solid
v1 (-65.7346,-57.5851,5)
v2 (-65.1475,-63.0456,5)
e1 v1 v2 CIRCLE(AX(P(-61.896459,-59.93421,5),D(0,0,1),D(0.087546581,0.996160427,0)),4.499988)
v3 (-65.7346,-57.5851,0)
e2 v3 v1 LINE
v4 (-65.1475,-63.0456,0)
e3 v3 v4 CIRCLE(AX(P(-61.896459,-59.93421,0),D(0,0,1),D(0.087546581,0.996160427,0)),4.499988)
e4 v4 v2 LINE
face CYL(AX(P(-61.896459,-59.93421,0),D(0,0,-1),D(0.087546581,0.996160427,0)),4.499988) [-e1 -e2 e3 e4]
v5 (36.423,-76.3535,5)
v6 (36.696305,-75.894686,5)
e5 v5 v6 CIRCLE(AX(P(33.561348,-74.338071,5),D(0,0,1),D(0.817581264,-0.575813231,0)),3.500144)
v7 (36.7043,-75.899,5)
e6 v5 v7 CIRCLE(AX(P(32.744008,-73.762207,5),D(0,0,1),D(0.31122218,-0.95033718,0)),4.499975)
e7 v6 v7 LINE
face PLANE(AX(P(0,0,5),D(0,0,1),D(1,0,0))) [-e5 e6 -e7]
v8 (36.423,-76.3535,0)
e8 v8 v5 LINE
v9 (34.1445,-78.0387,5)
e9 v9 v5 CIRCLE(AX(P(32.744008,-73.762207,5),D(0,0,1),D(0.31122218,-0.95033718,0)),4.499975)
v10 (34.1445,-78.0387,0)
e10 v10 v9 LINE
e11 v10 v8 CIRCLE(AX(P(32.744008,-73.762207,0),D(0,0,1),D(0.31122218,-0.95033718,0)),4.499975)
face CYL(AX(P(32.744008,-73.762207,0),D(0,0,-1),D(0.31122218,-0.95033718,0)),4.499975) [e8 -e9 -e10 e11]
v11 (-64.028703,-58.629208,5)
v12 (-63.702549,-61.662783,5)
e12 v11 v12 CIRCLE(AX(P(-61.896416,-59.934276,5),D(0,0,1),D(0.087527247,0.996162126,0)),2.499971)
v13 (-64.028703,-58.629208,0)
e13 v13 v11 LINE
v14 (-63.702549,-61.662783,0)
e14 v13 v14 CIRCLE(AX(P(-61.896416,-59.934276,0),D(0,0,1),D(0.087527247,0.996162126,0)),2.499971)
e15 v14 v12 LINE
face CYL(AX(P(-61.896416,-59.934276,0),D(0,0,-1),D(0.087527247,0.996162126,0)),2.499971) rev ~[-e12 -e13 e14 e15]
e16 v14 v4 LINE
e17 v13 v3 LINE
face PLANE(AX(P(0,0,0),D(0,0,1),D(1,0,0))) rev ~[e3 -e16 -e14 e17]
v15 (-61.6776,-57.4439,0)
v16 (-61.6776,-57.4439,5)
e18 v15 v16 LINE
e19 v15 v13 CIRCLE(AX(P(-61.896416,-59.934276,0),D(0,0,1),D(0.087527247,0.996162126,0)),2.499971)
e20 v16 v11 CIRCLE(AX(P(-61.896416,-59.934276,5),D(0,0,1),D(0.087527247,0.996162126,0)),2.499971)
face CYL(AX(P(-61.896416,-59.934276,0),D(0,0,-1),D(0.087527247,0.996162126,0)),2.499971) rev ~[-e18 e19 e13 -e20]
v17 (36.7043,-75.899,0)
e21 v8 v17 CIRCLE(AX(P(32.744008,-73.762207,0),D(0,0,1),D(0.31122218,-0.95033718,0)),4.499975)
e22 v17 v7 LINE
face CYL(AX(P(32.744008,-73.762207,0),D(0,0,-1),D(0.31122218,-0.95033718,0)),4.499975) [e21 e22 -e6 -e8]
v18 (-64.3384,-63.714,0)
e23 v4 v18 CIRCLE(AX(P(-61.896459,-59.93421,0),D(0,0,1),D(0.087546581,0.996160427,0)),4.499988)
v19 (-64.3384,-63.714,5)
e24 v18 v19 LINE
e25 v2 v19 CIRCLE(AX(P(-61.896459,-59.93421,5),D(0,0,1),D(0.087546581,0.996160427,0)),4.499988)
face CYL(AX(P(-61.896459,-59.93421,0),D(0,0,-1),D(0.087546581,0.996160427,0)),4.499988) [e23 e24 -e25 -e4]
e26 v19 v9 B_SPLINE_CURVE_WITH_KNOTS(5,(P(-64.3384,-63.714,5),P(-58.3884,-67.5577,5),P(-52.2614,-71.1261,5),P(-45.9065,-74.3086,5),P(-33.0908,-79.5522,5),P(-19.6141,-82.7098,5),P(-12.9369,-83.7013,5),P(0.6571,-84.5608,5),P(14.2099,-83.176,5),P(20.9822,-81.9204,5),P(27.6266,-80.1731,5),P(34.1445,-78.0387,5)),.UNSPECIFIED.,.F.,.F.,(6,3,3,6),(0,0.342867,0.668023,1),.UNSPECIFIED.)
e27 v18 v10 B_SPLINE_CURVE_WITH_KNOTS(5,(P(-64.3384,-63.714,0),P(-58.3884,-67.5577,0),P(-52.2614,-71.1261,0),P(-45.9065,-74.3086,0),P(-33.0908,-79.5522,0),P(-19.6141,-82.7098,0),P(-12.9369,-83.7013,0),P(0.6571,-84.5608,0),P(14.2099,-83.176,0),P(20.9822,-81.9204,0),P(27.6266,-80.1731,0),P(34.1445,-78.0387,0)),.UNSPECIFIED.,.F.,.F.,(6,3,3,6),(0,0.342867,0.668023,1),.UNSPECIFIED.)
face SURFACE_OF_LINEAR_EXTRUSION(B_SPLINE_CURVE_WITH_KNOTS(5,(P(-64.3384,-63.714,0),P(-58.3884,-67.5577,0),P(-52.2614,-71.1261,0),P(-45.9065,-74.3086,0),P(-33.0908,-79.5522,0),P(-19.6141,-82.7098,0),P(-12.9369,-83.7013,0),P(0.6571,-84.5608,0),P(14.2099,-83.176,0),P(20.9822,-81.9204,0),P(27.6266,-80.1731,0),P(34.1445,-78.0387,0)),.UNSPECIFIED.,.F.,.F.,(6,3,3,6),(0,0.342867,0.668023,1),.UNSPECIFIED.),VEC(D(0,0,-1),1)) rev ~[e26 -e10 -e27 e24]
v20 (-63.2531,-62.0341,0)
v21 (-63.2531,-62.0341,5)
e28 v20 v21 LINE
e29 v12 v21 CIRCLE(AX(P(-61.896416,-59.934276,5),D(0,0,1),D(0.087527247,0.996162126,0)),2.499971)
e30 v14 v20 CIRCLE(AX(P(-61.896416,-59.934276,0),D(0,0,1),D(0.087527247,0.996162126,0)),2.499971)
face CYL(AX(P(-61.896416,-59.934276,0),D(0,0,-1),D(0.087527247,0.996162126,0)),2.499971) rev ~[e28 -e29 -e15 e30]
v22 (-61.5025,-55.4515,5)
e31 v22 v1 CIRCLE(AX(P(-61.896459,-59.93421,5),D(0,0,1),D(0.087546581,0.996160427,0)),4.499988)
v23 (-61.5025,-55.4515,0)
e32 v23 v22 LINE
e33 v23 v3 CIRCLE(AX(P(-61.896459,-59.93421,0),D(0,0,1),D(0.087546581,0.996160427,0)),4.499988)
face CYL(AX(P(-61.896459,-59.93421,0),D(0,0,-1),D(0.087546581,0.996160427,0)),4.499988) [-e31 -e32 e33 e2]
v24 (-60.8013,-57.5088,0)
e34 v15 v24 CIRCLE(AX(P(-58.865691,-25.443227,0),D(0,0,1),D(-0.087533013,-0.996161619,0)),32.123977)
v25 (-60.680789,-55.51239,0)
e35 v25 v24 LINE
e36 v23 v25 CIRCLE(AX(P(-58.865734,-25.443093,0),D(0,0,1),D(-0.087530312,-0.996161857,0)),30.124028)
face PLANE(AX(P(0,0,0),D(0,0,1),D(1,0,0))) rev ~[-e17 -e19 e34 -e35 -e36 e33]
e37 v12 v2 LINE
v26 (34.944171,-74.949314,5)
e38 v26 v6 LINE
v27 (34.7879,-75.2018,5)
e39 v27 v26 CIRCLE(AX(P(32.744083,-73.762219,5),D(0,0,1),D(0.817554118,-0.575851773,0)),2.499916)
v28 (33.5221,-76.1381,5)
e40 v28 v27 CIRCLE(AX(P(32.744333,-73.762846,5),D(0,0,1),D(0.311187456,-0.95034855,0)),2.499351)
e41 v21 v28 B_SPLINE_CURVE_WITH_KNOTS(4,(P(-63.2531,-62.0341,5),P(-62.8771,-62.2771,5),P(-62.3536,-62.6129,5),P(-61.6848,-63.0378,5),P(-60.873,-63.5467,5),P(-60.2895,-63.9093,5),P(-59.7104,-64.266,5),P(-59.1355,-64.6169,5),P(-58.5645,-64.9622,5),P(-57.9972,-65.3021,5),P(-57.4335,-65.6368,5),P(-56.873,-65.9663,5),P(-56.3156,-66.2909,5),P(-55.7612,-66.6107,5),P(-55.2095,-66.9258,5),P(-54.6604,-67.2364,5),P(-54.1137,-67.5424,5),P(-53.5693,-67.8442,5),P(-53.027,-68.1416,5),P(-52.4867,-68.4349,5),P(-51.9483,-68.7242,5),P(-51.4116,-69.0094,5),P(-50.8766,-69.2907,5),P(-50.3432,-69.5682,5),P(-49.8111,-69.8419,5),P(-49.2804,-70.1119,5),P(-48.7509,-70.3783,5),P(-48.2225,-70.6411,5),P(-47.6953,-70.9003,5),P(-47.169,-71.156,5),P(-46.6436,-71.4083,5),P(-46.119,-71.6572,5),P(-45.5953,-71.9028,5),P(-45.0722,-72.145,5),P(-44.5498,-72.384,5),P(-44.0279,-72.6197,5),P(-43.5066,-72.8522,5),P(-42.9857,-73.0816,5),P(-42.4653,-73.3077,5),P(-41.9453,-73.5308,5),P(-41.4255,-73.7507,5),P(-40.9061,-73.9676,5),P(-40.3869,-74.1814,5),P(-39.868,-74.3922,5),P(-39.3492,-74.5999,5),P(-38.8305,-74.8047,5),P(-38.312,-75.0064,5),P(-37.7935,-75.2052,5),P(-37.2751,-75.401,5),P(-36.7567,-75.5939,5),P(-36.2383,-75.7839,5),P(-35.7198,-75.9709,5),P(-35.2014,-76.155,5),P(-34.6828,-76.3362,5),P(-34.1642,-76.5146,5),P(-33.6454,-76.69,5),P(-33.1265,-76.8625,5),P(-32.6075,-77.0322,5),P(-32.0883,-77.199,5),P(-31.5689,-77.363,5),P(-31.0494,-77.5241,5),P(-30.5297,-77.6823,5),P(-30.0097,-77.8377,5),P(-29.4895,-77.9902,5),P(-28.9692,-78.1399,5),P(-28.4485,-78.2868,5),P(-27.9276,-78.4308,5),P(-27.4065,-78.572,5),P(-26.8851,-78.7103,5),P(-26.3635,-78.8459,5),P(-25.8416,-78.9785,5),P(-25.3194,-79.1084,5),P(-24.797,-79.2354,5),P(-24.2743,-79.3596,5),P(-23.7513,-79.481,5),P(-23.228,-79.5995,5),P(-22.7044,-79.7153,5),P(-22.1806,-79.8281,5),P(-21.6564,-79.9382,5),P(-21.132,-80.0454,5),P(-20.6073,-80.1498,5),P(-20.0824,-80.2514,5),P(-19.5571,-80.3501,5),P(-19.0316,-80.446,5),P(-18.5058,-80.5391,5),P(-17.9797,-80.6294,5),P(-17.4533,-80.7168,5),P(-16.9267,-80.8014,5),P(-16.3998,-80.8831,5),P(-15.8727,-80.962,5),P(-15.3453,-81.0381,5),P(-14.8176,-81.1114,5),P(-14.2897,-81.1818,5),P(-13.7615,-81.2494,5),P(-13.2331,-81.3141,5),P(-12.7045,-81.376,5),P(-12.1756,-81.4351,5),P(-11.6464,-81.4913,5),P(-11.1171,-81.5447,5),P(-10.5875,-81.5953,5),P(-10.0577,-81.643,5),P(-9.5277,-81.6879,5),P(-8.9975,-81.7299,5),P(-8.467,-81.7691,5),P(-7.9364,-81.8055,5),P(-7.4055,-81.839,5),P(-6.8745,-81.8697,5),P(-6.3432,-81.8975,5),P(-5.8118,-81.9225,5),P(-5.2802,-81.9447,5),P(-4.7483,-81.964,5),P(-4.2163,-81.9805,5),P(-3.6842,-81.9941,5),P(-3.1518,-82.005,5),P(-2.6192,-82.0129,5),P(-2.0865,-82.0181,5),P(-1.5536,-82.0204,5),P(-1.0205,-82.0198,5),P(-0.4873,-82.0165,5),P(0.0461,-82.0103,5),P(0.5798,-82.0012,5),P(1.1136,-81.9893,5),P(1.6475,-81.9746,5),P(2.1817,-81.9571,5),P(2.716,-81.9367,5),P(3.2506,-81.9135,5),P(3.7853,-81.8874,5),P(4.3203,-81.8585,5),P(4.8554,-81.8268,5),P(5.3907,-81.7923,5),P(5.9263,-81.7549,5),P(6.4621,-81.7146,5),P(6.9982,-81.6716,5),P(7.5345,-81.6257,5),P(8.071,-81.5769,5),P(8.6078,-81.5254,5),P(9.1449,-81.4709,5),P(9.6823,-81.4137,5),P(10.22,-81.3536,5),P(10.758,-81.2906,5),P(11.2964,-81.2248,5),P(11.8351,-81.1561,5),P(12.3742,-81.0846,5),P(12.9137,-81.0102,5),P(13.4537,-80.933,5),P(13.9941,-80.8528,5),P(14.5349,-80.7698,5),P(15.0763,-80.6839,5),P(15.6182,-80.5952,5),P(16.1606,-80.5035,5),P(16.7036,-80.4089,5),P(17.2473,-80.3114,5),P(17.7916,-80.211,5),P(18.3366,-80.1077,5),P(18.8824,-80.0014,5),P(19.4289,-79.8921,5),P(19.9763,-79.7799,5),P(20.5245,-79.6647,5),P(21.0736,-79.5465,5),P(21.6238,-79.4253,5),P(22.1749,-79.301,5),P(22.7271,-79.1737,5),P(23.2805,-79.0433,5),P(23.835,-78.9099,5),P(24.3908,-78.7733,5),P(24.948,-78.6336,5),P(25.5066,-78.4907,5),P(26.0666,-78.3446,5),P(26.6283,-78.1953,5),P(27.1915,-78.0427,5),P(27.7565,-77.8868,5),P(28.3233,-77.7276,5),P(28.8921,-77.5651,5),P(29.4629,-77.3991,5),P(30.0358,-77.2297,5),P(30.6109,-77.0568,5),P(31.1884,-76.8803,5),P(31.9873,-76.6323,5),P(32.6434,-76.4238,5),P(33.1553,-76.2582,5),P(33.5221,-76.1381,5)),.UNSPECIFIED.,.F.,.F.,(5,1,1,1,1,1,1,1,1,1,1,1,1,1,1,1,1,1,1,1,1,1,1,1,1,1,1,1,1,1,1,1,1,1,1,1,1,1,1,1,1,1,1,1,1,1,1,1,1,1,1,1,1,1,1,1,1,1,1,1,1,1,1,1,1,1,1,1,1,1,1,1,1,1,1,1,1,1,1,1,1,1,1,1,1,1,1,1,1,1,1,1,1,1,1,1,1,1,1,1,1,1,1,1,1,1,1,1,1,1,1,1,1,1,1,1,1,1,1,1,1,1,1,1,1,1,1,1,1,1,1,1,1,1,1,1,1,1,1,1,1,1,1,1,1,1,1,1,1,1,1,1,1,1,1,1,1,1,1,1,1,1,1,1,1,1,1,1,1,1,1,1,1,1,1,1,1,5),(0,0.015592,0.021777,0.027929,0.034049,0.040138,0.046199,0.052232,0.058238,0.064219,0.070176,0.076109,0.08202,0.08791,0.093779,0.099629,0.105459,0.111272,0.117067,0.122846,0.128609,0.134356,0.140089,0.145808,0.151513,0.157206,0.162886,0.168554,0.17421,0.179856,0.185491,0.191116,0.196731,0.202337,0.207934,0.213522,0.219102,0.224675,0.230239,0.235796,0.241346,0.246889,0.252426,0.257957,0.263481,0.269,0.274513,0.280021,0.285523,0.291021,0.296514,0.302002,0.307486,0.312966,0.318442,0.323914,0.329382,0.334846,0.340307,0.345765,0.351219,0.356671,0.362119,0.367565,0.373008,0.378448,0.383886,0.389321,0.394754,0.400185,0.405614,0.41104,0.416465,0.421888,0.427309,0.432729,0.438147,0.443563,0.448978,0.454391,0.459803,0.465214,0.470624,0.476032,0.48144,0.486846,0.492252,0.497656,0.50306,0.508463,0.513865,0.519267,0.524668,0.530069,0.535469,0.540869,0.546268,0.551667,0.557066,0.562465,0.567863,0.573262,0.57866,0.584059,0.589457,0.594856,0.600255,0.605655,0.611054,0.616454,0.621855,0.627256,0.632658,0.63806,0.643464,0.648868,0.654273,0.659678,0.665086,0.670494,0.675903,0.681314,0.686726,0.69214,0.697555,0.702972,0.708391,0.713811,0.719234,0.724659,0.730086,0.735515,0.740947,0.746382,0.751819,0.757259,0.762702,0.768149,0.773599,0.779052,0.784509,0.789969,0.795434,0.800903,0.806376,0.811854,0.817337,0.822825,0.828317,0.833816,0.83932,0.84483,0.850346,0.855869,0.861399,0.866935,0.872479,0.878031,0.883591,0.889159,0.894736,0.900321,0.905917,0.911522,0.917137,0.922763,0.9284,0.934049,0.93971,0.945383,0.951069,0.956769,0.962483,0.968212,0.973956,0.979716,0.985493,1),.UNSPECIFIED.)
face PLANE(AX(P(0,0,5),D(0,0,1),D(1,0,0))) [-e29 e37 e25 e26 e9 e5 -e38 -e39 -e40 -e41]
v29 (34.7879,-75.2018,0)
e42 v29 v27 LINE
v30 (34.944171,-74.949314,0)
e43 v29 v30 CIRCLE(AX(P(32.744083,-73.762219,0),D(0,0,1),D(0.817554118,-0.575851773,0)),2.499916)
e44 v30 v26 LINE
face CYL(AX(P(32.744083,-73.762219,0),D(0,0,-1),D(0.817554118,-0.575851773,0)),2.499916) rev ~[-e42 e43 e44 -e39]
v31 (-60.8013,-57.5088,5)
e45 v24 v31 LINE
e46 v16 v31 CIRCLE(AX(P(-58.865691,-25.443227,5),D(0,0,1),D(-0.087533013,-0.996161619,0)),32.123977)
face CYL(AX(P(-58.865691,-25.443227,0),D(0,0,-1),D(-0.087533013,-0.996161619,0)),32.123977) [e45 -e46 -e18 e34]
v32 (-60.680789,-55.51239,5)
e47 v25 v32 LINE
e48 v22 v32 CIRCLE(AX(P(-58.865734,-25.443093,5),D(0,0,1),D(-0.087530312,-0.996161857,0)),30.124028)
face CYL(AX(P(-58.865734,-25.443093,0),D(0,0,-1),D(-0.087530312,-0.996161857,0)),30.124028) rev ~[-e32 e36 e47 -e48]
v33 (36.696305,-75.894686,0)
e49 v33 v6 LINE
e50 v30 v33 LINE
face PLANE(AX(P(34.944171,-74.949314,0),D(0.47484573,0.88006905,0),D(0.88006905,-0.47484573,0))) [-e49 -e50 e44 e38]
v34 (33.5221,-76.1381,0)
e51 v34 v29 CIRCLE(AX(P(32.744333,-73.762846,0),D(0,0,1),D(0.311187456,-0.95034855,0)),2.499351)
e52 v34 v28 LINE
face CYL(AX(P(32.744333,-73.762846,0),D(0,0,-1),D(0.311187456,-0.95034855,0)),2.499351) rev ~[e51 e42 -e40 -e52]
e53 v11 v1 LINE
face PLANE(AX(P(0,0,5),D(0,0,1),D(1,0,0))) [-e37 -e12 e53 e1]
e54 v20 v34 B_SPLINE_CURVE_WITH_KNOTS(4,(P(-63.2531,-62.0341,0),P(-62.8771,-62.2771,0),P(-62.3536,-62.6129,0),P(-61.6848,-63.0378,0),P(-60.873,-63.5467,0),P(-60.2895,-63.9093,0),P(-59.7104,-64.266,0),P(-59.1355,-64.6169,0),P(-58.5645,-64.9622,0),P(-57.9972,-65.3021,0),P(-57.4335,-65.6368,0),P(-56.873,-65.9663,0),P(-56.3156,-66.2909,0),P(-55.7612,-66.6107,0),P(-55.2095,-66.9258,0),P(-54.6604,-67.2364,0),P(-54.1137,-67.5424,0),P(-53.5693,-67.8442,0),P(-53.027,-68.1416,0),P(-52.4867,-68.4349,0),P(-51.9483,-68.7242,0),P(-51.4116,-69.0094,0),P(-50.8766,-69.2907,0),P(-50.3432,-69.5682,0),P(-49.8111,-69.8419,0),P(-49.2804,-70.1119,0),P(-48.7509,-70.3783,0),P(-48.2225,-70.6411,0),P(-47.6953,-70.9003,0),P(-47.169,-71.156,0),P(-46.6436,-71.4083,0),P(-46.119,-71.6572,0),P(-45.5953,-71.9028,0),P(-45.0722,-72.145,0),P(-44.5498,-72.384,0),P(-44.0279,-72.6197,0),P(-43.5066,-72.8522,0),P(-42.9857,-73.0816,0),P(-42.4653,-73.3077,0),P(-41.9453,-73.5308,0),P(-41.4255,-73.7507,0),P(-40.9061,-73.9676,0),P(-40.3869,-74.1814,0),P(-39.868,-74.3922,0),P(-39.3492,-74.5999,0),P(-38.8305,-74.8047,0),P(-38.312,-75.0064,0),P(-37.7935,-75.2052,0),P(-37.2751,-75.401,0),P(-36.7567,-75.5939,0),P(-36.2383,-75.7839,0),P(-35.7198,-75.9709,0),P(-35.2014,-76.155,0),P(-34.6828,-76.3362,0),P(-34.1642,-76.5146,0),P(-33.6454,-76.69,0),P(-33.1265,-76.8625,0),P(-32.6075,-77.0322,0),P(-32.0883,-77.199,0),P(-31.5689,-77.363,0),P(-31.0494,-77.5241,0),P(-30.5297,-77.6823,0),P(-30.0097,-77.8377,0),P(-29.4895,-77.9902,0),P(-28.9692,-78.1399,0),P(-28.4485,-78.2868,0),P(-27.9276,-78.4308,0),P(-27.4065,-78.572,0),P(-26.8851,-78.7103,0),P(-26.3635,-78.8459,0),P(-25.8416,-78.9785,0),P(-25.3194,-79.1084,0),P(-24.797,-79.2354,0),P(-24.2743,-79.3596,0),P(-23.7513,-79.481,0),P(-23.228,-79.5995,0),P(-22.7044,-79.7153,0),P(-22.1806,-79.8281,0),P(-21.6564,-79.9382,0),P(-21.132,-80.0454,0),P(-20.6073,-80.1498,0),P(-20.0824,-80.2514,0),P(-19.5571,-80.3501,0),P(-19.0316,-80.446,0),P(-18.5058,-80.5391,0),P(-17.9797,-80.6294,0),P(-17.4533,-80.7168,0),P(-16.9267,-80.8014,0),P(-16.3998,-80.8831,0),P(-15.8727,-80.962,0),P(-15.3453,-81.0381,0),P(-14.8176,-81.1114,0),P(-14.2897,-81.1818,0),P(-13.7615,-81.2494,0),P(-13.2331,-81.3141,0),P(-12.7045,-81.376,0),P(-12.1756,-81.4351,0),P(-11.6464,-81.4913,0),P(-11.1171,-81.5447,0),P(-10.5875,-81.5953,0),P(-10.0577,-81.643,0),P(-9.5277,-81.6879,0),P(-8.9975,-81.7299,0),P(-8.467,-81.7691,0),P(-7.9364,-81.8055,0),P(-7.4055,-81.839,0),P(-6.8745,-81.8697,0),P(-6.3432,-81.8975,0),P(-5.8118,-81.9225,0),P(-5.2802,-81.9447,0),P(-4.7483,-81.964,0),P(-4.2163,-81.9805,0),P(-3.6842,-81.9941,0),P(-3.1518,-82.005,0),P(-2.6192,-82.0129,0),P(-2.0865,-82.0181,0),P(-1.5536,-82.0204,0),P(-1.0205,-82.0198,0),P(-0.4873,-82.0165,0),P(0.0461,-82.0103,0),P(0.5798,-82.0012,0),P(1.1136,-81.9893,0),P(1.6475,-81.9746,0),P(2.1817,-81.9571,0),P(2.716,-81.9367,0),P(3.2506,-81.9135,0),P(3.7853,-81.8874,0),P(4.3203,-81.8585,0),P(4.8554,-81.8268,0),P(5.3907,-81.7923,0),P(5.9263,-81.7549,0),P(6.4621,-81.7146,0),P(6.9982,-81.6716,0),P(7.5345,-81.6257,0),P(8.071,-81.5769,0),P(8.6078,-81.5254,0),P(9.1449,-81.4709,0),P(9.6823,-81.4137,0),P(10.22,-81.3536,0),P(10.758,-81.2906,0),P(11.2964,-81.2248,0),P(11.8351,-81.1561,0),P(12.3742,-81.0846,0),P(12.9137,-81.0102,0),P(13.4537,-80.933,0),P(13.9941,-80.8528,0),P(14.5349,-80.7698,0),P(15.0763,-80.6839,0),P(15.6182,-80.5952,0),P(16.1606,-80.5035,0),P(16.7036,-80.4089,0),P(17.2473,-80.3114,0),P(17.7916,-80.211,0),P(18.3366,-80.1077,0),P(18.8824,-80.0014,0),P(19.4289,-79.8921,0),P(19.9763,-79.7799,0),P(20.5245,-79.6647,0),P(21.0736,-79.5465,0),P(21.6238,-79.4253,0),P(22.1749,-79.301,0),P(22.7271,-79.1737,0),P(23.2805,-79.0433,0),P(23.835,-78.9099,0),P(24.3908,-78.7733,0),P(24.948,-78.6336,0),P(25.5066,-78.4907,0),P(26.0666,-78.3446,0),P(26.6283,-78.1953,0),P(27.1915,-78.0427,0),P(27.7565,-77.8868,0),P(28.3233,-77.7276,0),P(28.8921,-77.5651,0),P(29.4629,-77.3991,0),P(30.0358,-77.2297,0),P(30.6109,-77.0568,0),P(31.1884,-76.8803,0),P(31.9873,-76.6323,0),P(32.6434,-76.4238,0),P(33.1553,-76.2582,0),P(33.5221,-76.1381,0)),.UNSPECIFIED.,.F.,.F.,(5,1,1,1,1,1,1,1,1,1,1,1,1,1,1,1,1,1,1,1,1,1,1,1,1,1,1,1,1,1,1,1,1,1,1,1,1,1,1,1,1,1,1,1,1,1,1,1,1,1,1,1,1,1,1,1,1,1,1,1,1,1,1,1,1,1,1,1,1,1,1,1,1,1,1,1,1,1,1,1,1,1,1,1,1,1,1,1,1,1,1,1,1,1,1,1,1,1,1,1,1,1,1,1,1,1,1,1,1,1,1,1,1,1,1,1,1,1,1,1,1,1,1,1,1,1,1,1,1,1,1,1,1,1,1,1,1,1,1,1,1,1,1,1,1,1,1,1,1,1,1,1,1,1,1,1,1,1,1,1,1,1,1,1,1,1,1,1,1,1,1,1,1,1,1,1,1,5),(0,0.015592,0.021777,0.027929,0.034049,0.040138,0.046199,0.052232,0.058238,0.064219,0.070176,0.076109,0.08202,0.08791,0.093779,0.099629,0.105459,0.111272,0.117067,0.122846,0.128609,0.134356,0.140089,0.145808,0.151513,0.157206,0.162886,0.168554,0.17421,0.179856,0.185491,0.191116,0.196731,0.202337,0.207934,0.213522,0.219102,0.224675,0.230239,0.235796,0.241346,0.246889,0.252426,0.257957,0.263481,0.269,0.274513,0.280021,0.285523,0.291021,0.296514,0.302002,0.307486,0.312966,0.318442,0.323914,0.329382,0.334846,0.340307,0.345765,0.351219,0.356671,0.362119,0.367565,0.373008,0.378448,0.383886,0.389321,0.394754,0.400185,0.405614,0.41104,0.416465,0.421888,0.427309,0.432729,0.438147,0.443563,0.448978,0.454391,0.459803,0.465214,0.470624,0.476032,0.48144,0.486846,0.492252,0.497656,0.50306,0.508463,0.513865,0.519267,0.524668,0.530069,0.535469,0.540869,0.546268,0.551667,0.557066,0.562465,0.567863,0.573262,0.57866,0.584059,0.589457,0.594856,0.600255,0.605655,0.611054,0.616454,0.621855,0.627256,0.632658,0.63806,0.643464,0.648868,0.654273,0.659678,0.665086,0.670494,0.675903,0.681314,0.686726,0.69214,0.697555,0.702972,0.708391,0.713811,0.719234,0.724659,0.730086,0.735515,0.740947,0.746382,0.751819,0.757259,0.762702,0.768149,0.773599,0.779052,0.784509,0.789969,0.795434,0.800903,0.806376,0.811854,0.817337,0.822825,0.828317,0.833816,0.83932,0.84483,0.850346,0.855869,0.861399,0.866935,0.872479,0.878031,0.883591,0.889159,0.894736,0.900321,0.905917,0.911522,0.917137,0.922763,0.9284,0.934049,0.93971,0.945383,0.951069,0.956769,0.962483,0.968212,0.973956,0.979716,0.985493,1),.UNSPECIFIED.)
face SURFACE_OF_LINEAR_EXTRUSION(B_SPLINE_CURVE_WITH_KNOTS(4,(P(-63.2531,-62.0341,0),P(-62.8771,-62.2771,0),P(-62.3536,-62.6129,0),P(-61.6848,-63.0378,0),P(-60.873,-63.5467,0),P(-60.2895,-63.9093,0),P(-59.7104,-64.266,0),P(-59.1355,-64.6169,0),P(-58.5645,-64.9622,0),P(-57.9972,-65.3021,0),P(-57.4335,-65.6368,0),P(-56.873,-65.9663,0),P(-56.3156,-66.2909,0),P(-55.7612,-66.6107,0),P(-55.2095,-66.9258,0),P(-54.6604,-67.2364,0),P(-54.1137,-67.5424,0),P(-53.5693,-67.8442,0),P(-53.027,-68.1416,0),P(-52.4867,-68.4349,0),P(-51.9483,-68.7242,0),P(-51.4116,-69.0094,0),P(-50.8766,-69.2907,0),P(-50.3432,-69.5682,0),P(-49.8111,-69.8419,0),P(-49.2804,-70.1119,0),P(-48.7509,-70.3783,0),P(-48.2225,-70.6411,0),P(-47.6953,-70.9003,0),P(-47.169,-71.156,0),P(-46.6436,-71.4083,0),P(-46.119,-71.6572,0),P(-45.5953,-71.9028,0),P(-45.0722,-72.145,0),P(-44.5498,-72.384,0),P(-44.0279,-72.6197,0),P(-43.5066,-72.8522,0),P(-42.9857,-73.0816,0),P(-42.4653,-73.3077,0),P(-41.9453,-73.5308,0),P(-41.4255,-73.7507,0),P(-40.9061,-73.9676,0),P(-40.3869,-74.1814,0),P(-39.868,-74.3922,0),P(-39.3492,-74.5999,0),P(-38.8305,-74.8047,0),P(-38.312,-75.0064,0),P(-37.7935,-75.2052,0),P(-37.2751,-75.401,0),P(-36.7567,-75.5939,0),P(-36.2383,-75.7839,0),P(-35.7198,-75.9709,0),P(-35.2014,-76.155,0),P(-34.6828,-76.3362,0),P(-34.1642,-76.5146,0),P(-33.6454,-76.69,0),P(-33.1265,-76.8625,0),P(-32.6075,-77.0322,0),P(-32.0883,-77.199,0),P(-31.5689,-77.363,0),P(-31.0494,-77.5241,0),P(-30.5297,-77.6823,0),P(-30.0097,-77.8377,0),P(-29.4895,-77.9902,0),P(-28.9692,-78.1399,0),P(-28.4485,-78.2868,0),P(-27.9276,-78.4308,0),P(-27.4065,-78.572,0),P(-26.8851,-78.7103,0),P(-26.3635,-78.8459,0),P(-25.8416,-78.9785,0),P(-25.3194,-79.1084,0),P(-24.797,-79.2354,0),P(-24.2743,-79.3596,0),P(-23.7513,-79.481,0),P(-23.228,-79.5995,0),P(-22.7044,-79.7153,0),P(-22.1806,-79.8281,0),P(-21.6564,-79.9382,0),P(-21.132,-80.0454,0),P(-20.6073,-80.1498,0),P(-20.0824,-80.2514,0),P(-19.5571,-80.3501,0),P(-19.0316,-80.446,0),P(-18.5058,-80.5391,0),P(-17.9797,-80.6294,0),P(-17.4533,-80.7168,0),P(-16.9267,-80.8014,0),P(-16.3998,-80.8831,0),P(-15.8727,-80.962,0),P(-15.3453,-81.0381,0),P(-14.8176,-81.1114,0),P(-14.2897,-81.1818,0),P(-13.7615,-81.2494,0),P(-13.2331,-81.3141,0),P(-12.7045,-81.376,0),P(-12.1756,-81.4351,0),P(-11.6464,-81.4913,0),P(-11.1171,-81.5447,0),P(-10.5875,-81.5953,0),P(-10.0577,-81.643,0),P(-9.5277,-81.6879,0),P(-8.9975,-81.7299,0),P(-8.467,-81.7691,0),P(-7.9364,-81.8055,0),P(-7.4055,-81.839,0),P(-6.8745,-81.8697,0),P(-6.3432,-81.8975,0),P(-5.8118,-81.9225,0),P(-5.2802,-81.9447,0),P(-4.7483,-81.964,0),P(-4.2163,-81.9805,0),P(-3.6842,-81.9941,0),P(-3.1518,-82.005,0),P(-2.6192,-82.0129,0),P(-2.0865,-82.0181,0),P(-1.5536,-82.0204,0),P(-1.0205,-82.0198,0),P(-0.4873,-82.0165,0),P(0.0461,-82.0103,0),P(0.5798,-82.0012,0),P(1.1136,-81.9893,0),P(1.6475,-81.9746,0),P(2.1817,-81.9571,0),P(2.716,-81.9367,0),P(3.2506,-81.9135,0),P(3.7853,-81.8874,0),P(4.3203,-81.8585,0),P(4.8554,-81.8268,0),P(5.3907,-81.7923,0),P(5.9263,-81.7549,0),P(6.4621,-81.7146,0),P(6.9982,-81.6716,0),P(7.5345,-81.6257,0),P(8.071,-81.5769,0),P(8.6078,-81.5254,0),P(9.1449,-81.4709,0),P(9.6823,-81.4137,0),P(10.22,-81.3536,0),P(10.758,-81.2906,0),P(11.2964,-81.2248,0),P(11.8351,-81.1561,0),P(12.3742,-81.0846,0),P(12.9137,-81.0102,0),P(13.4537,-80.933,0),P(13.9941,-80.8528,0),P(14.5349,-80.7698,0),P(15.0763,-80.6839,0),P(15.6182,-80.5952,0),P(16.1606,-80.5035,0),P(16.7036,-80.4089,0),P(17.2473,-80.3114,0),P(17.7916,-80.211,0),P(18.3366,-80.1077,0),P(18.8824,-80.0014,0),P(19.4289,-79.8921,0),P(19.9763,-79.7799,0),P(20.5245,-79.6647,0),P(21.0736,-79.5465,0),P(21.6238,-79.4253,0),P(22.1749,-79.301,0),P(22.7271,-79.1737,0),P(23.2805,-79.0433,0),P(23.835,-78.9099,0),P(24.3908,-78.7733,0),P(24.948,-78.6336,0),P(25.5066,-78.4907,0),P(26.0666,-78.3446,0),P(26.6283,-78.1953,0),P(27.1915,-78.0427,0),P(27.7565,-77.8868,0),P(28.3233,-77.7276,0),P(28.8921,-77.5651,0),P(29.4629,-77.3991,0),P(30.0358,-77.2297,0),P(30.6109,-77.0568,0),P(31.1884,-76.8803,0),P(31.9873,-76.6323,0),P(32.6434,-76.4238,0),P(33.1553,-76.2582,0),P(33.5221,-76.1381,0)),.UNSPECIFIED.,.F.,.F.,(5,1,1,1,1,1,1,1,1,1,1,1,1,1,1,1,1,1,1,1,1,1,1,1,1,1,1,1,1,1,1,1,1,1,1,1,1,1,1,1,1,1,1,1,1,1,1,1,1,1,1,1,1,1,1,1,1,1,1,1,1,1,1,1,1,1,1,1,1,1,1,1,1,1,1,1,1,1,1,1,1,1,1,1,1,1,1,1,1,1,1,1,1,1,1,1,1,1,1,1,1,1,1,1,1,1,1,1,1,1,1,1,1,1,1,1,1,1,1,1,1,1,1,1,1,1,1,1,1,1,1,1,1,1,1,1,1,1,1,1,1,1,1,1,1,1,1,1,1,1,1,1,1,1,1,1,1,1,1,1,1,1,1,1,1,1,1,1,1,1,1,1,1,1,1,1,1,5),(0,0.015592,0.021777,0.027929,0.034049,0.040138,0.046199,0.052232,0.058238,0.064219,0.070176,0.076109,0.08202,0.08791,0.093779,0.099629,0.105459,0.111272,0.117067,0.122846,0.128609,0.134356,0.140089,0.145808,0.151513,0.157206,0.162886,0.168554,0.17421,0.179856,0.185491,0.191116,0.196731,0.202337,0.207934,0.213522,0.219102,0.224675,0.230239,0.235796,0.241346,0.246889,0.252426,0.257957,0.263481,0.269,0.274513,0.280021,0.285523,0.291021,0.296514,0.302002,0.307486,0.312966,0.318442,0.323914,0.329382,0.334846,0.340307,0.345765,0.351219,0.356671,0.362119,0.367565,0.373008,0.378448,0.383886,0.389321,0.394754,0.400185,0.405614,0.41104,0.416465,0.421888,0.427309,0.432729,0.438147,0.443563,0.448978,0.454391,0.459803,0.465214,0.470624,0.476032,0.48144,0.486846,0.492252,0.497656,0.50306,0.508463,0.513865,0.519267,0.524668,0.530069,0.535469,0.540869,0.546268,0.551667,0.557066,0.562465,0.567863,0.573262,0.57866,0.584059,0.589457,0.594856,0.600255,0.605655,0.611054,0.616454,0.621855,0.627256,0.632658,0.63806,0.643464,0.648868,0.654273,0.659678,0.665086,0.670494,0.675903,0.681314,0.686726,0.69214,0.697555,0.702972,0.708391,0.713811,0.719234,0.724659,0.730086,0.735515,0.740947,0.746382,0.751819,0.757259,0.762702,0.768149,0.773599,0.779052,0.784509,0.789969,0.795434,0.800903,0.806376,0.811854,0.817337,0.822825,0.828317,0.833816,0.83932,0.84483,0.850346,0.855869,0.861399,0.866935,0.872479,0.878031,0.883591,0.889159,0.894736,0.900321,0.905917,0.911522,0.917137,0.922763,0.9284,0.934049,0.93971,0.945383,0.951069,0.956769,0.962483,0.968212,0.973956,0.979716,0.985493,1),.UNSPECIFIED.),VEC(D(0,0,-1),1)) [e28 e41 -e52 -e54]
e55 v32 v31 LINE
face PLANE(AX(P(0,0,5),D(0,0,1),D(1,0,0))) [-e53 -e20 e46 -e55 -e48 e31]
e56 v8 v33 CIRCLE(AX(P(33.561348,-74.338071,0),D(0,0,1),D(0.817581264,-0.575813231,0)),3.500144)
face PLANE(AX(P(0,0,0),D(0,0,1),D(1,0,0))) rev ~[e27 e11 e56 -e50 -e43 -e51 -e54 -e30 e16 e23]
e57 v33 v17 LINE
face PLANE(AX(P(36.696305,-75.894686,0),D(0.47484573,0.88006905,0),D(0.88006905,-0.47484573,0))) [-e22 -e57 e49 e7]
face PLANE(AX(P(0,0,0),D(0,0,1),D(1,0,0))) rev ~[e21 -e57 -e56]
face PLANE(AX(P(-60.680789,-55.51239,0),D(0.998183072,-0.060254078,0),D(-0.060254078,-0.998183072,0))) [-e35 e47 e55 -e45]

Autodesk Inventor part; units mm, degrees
ref_plane "YZ Plane" through (0, 0, 0) normal (1, 0, 0) x (0, 1, 0)
ref_plane "XZ Plane" through (0, 0, 0) normal (0, 1, 0) x (-1, 0, 0)
ref_plane "XY Plane" through (0, 0, 0) normal (0, 0, 1) x (1, 0, 0)
sketch "スケッチ1" plane through (0, 0, 0) normal (0, 0, 1) x (1, 0, 0)
  circle A0 centre (0, -30) radius 22.5
  arc A1 (33.5221, -76.1381) -> (34.7879, -75.2018) centre (32.744, -73.7622) ccw
  arc A2 (25.323, -41.3574) -> (34.2025, -71.7318) centre (49.1917, -50.8648) ccw
  arc A3 (25.323, -41.3574) -> (17.6049, -10.4152) centre (-0.0473, -31.252) ccw
  arc A4 (17.6049, -10.4152) -> (7.2408, -4.7162) centre (-0.2944, -30.6931) ccw
  arc A5 (5.1078, -1.4883) -> (7.2408, -4.7162) centre (8.0549, -1.8596) ccw
  arc A6 (5.1078, -1.4883) -> (-5.8369, -1.4852) centre (-0.3643, -0.7018) ccw
  arc A7 (-5.8369, -1.4852) -> (-5.7215, -2.051) centre (-0.3936, -0.6703) ccw
  arc A8 (-7.4636, -3.4089) -> (-5.7215, -2.051) centre (-8.3074, -0.53) ccw
  arc A9 (-7.4636, -3.4089) -> (-26.8108, -27.5489) centre (0.1311, -29.3188) ccw
  arc A10 (-61.6776, -57.4439) -> (-26.8108, -27.5489) centre (-58.8657, -25.4432) ccw
  arc A11 (-61.6776, -57.4439) -> (-63.2531, -62.0341) centre (-61.8964, -59.9343) ccw
  spline S0 degree 4 poles (-63.2531, -62.0341) (-62.8771, -62.2771) (-62.3536, -62.6129) (-61.6848, -63.0378) (-60.873, -63.5467) (-60.2895, -63.9093) (-59.7104, -64.266) (-59.1355, -64.6169) (-58.5645, -64.9622) (-57.9972, -65.3021) (-57.4335, -65.6368) (-56.873, -65.9663) (-56.3156, -66.2909) (-55.7612, -66.6107) (-55.2095, -66.9258) (-54.6604, -67.2364) (-54.1137, -67.5424) (-53.5693, -67.8442) (-53.027, -68.1416) (-52.4867, -68.4349) (-51.9483, -68.7242) (-51.4116, -69.0094) (-50.8766, -69.2907) (-50.3432, -69.5682) (-49.8111, -69.8419) (-49.2804, -70.1119) (-48.7509, -70.3783) (-48.2225, -70.6411) (-47.6953, -70.9003) (-47.169, -71.156) (-46.6436, -71.4083) (-46.119, -71.6572) (-45.5953, -71.9028) (-45.0722, -72.145) (-44.5498, -72.384) (-44.0279, -72.6197) (-43.5066, -72.8522) (-42.9857, -73.0816) (-42.4653, -73.3077) (-41.9453, -73.5308) (-41.4255, -73.7507) (-40.9061, -73.9676) (-40.3869, -74.1814) (-39.868, -74.3922) (-39.3492, -74.5999) (-38.8305, -74.8047) (-38.312, -75.0064) (-37.7935, -75.2052) (-37.2751, -75.401) (-36.7567, -75.5939) (-36.2383, -75.7839) (-35.7198, -75.9709) (-35.2014, -76.155) (-34.6828, -76.3362) (-34.1642, -76.5146) (-33.6454, -76.69) (-33.1265, -76.8625) (-32.6075, -77.0322) (-32.0883, -77.199) (-31.5689, -77.363) (-31.0494, -77.5241) (-30.5297, -77.6823) (-30.0097, -77.8377) (-29.4895, -77.9902) (-28.9692, -78.1399) (-28.4485, -78.2868) (-27.9276, -78.4308) (-27.4065, -78.572) (-26.8851, -78.7103) (-26.3635, -78.8459) (-25.8416, -78.9785) (-25.3194, -79.1084) (-24.797, -79.2354) (-24.2743, -79.3596) (-23.7513, -79.481) (-23.228, -79.5995) (-22.7044, -79.7153) (-22.1806, -79.8281) (-21.6564, -79.9382) (-21.132, -80.0454) (-20.6073, -80.1498) (-20.0824, -80.2514) (-19.5571, -80.3501) (-19.0316, -80.446) (-18.5058, -80.5391) (-17.9797, -80.6294) (-17.4533, -80.7168) (-16.9267, -80.8014) (-16.3998, -80.8831) (-15.8727, -80.962) (-15.3453, -81.0381) (-14.8176, -81.1114) (-14.2897, -81.1818) (-13.7615, -81.2494) (-13.2331, -81.3141) (-12.7045, -81.376) (-12.1756, -81.4351) (-11.6464, -81.4913) (-11.1171, -81.5447) (-10.5875, -81.5953) (-10.0577, -81.643) (-9.5277, -81.6879) (-8.9975, -81.7299) (-8.467, -81.7691) (-7.9364, -81.8055) (-7.4055, -81.839) (-6.8745, -81.8697) (-6.3432, -81.8975) (-5.8118, -81.9225) (-5.2802, -81.9447) (-4.7483, -81.964) (-4.2163, -81.9805) (-3.6842, -81.9941) (-3.1518, -82.005) (-2.6192, -82.0129) (-2.0865, -82.0181) (-1.5536, -82.0204) (-1.0205, -82.0198) (-0.4873, -82.0165) (0.0461, -82.0103) (0.5798, -82.0012) (1.1136, -81.9893) (1.6475, -81.9746) (2.1817, -81.9571) (2.716, -81.9367) (3.2506, -81.9135) (3.7853, -81.8874) (4.3203, -81.8585) (4.8554, -81.8268) (5.3907, -81.7923) (5.9263, -81.7549) (6.4621, -81.7146) (6.9982, -81.6716) (7.5345, -81.6257) (8.071, -81.5769) (8.6078, -81.5254) (9.1449, -81.4709) (9.6823, -81.4137) (10.22, -81.3536) (10.758, -81.2906) (11.2964, -81.2248) (11.8351, -81.1561) (12.3742, -81.0846) (12.9137, -81.0102) (13.4537, -80.933) (13.9941, -80.8528) (14.5349, -80.7698) (15.0763, -80.6839) (15.6182, -80.5952) (16.1606, -80.5035) (16.7036, -80.4089) (17.2473, -80.3114) (17.7916, -80.211) (18.3366, -80.1077) (18.8824, -80.0014) (19.4289, -79.8921) (19.9763, -79.7799) (20.5245, -79.6647) (21.0736, -79.5465) (21.6238, -79.4253) (22.1749, -79.301) (22.7271, -79.1737) (23.2805, -79.0433) (23.835, -78.9099) (24.3908, -78.7733) (24.948, -78.6336) (25.5066, -78.4907) (26.0666, -78.3446) (26.6283, -78.1953) (27.1915, -78.0427) (27.7565, -77.8868) (28.3233, -77.7276) (28.8921, -77.5651) (29.4629, -77.3991) (30.0358, -77.2297) (30.6109, -77.0568) (31.1884, -76.8803) (31.9873, -76.6323) (32.6434, -76.4238) (33.1553, -76.2582) (33.5221, -76.1381) knots 0 0 0 0 0 0.015592 0.021777 0.027929 0.034049 0.040138 0.046199 0.052232 0.058238 0.064219 0.070176 0.076109 0.08202 0.08791 0.093779 0.099629 0.105459 0.111272 0.117067 0.122846 0.128609 0.134356 0.140089 0.145808 0.151513 0.157206 0.162886 0.168554 0.17421 0.179856 0.185491 0.191116 0.196731 0.202337 0.207934 0.213522 0.219102 0.224675 0.230239 0.235796 0.241346 0.246889 0.252426 0.257957 0.263481 0.269 0.274513 0.280021 0.285523 0.291021 0.296514 0.302002 0.307486 0.312966 0.318442 0.323914 0.329382 0.334846 0.340307 0.345765 0.351219 0.356671 0.362119 0.367565 0.373008 0.378448 0.383886 0.389321 0.394754 0.400185 0.405614 0.41104 0.416465 0.421888 0.427309 0.432729 0.438147 0.443563 0.448978 0.454391 0.459803 0.465214 0.470624 0.476032 0.48144 0.486846 0.492252 0.497656 0.50306 0.508463 0.513865 0.519267 0.524668 0.530069 0.535469 0.540869 0.546268 0.551667 0.557066 0.562465 0.567863 0.573262 0.57866 0.584059 0.589457 0.594856 0.600255 0.605655 0.611054 0.616454 0.621855 0.627256 0.632658 0.63806 0.643464 0.648868 0.654273 0.659678 0.665086 0.670494 0.675903 0.681314 0.686726 0.69214 0.697555 0.702972 0.708391 0.713811 0.719234 0.724659 0.730086 0.735515 0.740947 0.746382 0.751819 0.757259 0.762702 0.768149 0.773599 0.779052 0.784509 0.789969 0.795434 0.800903 0.806376 0.811854 0.817337 0.822825 0.828317 0.833816 0.83932 0.84483 0.850346 0.855869 0.861399 0.866935 0.872479 0.878031 0.883591 0.889159 0.894736 0.900321 0.905917 0.911522 0.917137 0.922763 0.9284 0.934049 0.93971 0.945383 0.951069 0.956769 0.962483 0.968212 0.973956 0.979716 0.985493 1 1 1 1 1
  arc A12 (34.1445, -78.0387) -> (35.3693, -70.1074) centre (32.744, -73.7622) ccw
  arc A13 (27.181, -42.0975) -> (35.3693, -70.1074) centre (49.1917, -50.8648) ccw
  arc A14 (27.181, -42.0975) -> (18.9132, -8.9024) centre (-0.0473, -31.252) ccw
  arc A15 (18.9132, -8.9024) -> (7.7922, -2.7937) centre (-0.2944, -30.6931) ccw
  arc A16 (7.0908, -1.7497) -> (7.7922, -2.7937) centre (8.0549, -1.8596) ccw
  arc A17 (7.0908, -1.7497) -> (-7.8158, -1.7749) centre (-0.3643, -0.7018) ccw
  arc A18 (-7.8158, -1.7749) -> (-7.8596, -1.4241) centre (-0.3936, -0.6703) ccw
  arc A19 (-8.0261, -1.4896) -> (-7.8596, -1.4241) centre (-8.3074, -0.53) ccw
  arc A20 (-8.0261, -1.4896) -> (-28.8065, -27.4178) centre (0.1311, -29.3188) ccw
  arc A21 (-61.5025, -55.4515) -> (-28.8065, -27.4178) centre (-58.8657, -25.4432) ccw
  arc A22 (-61.5025, -55.4515) -> (-64.3384, -63.714) centre (-61.8964, -59.9343) ccw
  line L0 (32.744, -73.7622) -> (36.7043, -75.899)
  line L1 (-58.8657, -25.4432) -> (-60.8013, -57.5088)
  line L2 (-61.8964, -59.9343) -> (-65.1475, -63.0456)
  line L3 (-61.8964, -59.9343) -> (-65.7346, -57.5851)
  line L4 (49.1917, -50.8648) -> (30.5824, -70.5938)
  arc A23 (-5.8375, -1.4811) -> (-5.8362, -1.4893) centre (-4.7979, -1.3331) ccw
  arc A24 (-5.8362, -1.4893) -> (-5.8121, -1.6365) centre (-0.3936, -0.6703) ccw
  arc A25 (-6.0587, -2.5158) -> (-5.8121, -1.6365) centre (-6.8458, -1.8208) ccw
  arc A26 (-7.4636, -3.4089) -> (-6.0587, -2.5158) centre (-8.3074, -0.53) ccw
  arc A27 (-7.4636, -3.4089) -> (-26.8108, -27.5489) centre (0.1311, -29.3188) ccw
  arc A28 (-61.6776, -57.4439) -> (-26.8108, -27.5489) centre (-58.8657, -25.4432) ccw
  arc A29 (-61.6776, -57.4439) -> (-63.2531, -62.0341) centre (-61.8964, -59.9343) ccw
  spline S1 degree 4 poles (-63.2531, -62.0341) (-62.8771, -62.2771) (-62.3536, -62.6129) (-61.6848, -63.0378) (-60.873, -63.5467) (-60.2895, -63.9093) (-59.7104, -64.266) (-59.1355, -64.6169) (-58.5645, -64.9622) (-57.9972, -65.3021) (-57.4335, -65.6368) (-56.873, -65.9663) (-56.3156, -66.2909) (-55.7612, -66.6107) (-55.2095, -66.9258) (-54.6604, -67.2364) (-54.1137, -67.5424) (-53.5693, -67.8442) (-53.027, -68.1416) (-52.4867, -68.4349) (-51.9483, -68.7242) (-51.4116, -69.0094) (-50.8766, -69.2907) (-50.3432, -69.5682) (-49.8111, -69.8419) (-49.2804, -70.1119) (-48.7509, -70.3783) (-48.2225, -70.6411) (-47.6953, -70.9003) (-47.169, -71.156) (-46.6436, -71.4083) (-46.119, -71.6572) (-45.5953, -71.9028) (-45.0722, -72.145) (-44.5498, -72.384) (-44.0279, -72.6197) (-43.5066, -72.8522) (-42.9857, -73.0816) (-42.4653, -73.3077) (-41.9453, -73.5308) (-41.4255, -73.7507) (-40.9061, -73.9676) (-40.3869, -74.1814) (-39.868, -74.3922) (-39.3492, -74.5999) (-38.8305, -74.8047) (-38.312, -75.0064) (-37.7935, -75.2052) (-37.2751, -75.401) (-36.7567, -75.5939) (-36.2383, -75.7839) (-35.7198, -75.9709) (-35.2014, -76.155) (-34.6828, -76.3362) (-34.1642, -76.5146) (-33.6454, -76.69) (-33.1265, -76.8625) (-32.6075, -77.0322) (-32.0883, -77.199) (-31.5689, -77.363) (-31.0494, -77.5241) (-30.5297, -77.6823) (-30.0097, -77.8377) (-29.4895, -77.9902) (-28.9692, -78.1399) (-28.4485, -78.2868) (-27.9276, -78.4308) (-27.4065, -78.572) (-26.8851, -78.7103) (-26.3635, -78.8459) (-25.8416, -78.9785) (-25.3194, -79.1084) (-24.797, -79.2354) (-24.2743, -79.3596) (-23.7513, -79.481) (-23.228, -79.5995) (-22.7044, -79.7153) (-22.1806, -79.8281) (-21.6564, -79.9382) (-21.132, -80.0454) (-20.6073, -80.1498) (-20.0824, -80.2514) (-19.5571, -80.3501) (-19.0316, -80.446) (-18.5058, -80.5391) (-17.9797, -80.6294) (-17.4533, -80.7168) (-16.9267, -80.8014) (-16.3998, -80.8831) (-15.8727, -80.962) (-15.3453, -81.0381) (-14.8176, -81.1114) (-14.2897, -81.1818) (-13.7615, -81.2494) (-13.2331, -81.3141) (-12.7045, -81.376) (-12.1756, -81.4351) (-11.6464, -81.4913) (-11.1171, -81.5447) (-10.5875, -81.5953) (-10.0577, -81.643) (-9.5277, -81.6879) (-8.9975, -81.7299) (-8.467, -81.7691) (-7.9364, -81.8055) (-7.4055, -81.839) (-6.8745, -81.8697) (-6.3432, -81.8975) (-5.8118, -81.9225) (-5.2802, -81.9447) (-4.7483, -81.964) (-4.2163, -81.9805) (-3.6842, -81.9941) (-3.1518, -82.005) (-2.6192, -82.0129) (-2.0865, -82.0181) (-1.5536, -82.0204) (-1.0205, -82.0198) (-0.4873, -82.0165) (0.0461, -82.0103) (0.5798, -82.0012) (1.1136, -81.9893) (1.6475, -81.9746) (2.1817, -81.9571) (2.716, -81.9367) (3.2506, -81.9135) (3.7853, -81.8874) (4.3203, -81.8585) (4.8554, -81.8268) (5.3907, -81.7923) (5.9263, -81.7549) (6.4621, -81.7146) (6.9982, -81.6716) (7.5345, -81.6257) (8.071, -81.5769) (8.6078, -81.5254) (9.1449, -81.4709) (9.6823, -81.4137) (10.22, -81.3536) (10.758, -81.2906) (11.2964, -81.2248) (11.8351, -81.1561) (12.3742, -81.0846) (12.9137, -81.0102) (13.4537, -80.933) (13.9941, -80.8528) (14.5349, -80.7698) (15.0763, -80.6839) (15.6182, -80.5952) (16.1606, -80.5035) (16.7036, -80.4089) (17.2473, -80.3114) (17.7916, -80.211) (18.3366, -80.1077) (18.8824, -80.0014) (19.4289, -79.8921) (19.9763, -79.7799) (20.5245, -79.6647) (21.0736, -79.5465) (21.6238, -79.4253) (22.1749, -79.301) (22.7271, -79.1737) (23.2805, -79.0433) (23.835, -78.9099) (24.3908, -78.7733) (24.948, -78.6336) (25.5066, -78.4907) (26.0666, -78.3446) (26.6283, -78.1953) (27.1915, -78.0427) (27.7565, -77.8868) (28.3233, -77.7276) (28.8921, -77.5651) (29.4629, -77.3991) (30.0358, -77.2297) (30.6109, -77.0568) (31.1884, -76.8803) (31.9873, -76.6323) (32.6434, -76.4238) (33.1553, -76.2582) (33.5221, -76.1381) knots 0 0 0 0 0 0.015592 0.021777 0.027929 0.034049 0.040138 0.046199 0.052232 0.058238 0.064219 0.070176 0.076109 0.08202 0.08791 0.093779 0.099629 0.105459 0.111272 0.117067 0.122846 0.128609 0.134356 0.140089 0.145808 0.151513 0.157206 0.162886 0.168554 0.17421 0.179856 0.185491 0.191116 0.196731 0.202337 0.207934 0.213522 0.219102 0.224675 0.230239 0.235796 0.241346 0.246889 0.252426 0.257957 0.263481 0.269 0.274513 0.280021 0.285523 0.291021 0.296514 0.302002 0.307486 0.312966 0.318442 0.323914 0.329382 0.334846 0.340307 0.345765 0.351219 0.356671 0.362119 0.367565 0.373008 0.378448 0.383886 0.389321 0.394754 0.400185 0.405614 0.41104 0.416465 0.421888 0.427309 0.432729 0.438147 0.443563 0.448978 0.454391 0.459803 0.465214 0.470624 0.476032 0.48144 0.486846 0.492252 0.497656 0.50306 0.508463 0.513865 0.519267 0.524668 0.530069 0.535469 0.540869 0.546268 0.551667 0.557066 0.562465 0.567863 0.573262 0.57866 0.584059 0.589457 0.594856 0.600255 0.605655 0.611054 0.616454 0.621855 0.627256 0.632658 0.63806 0.643464 0.648868 0.654273 0.659678 0.665086 0.670494 0.675903 0.681314 0.686726 0.69214 0.697555 0.702972 0.708391 0.713811 0.719234 0.724659 0.730086 0.735515 0.740947 0.746382 0.751819 0.757259 0.762702 0.768149 0.773599 0.779052 0.784509 0.789969 0.795434 0.800903 0.806376 0.811854 0.817337 0.822825 0.828317 0.833816 0.83932 0.84483 0.850346 0.855869 0.861399 0.866935 0.872479 0.878031 0.883591 0.889159 0.894736 0.900321 0.905917 0.911522 0.917137 0.922763 0.9284 0.934049 0.93971 0.945383 0.951069 0.956769 0.962483 0.968212 0.973956 0.979716 0.985493 1 1 1 1 1
  arc A30 (33.5221, -76.1381) -> (34.7879, -75.2018) centre (32.744, -73.7622) ccw
  arc A31 (34.7879, -75.2018) -> (34.2598, -73.0105) centre (33.5615, -74.3381) ccw
  arc A32 (25.323, -41.3574) -> (30.5824, -70.5938) centre (44.8156, -52.9421) ccw
  arc A33 (25.323, -41.3574) -> (17.6049, -10.4152) centre (-0.0473, -31.252) ccw
  arc A34 (17.6049, -10.4152) -> (7.2408, -4.7162) centre (-0.2944, -30.6931) ccw
  arc A35 (5.1078, -1.4883) -> (7.2408, -4.7162) centre (8.0549, -1.8596) ccw
  arc A36 (5.1078, -1.4883) -> (-5.8375, -1.4811) centre (-0.3643, -0.7018) ccw
  circle A37 centre (0, -30) radius 22.7
  arc A38 (30.5824, -70.5938) -> (34.2598, -73.0105) centre (44.8156, -52.9421) ccw
  arc A39 (34.7879, -75.2018) -> (34.2025, -71.7318) centre (32.744, -73.7622) ccw
  arc A40 (31.8378, -69.0369) -> (35.1909, -71.2404) centre (44.8156, -52.9421) ccw
  arc A41 (36.423, -76.3535) -> (35.1909, -71.2404) centre (33.5615, -74.3381) ccw
  spline S2 degree 5 poles (-64.3384, -63.714) (-58.3884, -67.5577) (-52.2614, -71.1261) (-45.9065, -74.3086) (-33.0908, -79.5522) (-19.6141, -82.7098) (-12.9369, -83.7013) (0.6571, -84.5608) (14.2099, -83.176) (20.9822, -81.9204) (27.6266, -80.1731) (34.1445, -78.0387) knots 0 0 0 0 0 0 0.342867 0.342867 0.342867 0.668023 0.668023 0.668023 1 1 1 1 1 1
  point P0 (0, 0)
  point P1 (0, 0)
  point P2 (34.9441, -74.9493)
  point P3 (-60.6808, -55.5124)
  point P4 (-63.7026, -61.6628)
  point P5 (-64.0288, -58.6292)
  point P6 (32.9348, -68.0999)
  point P7 (0, 0)
  point P8 (-5.8121, -1.6365)
  point P9 (25.323, -41.3574)
  point P10 (-5.8121, -1.6365)
  point P11 (34.9441, -74.9493)
  point P12 (-63.7026, -61.6628)
  point P13 (25.323, -41.3574)
  point P14 (36.6963, -75.8947)
  point P15 (31.9593, -69.1341)
  point P16 (34.9338, -74.9438)
  dimension "d0" = 2
  dimension "d3" = 2
extrude "押し出し1" add sketch "スケッチ1" along normal blind 5 contours A10 A11 L3 A22 A21 L1 | A11 L2 A22 L3 | L0 A41 A12 S2 A22 L2 A11 S0 A1 A39 | L0 A12 A41
properties part number "脚ゴム" material "ゴム、シリコーン"
